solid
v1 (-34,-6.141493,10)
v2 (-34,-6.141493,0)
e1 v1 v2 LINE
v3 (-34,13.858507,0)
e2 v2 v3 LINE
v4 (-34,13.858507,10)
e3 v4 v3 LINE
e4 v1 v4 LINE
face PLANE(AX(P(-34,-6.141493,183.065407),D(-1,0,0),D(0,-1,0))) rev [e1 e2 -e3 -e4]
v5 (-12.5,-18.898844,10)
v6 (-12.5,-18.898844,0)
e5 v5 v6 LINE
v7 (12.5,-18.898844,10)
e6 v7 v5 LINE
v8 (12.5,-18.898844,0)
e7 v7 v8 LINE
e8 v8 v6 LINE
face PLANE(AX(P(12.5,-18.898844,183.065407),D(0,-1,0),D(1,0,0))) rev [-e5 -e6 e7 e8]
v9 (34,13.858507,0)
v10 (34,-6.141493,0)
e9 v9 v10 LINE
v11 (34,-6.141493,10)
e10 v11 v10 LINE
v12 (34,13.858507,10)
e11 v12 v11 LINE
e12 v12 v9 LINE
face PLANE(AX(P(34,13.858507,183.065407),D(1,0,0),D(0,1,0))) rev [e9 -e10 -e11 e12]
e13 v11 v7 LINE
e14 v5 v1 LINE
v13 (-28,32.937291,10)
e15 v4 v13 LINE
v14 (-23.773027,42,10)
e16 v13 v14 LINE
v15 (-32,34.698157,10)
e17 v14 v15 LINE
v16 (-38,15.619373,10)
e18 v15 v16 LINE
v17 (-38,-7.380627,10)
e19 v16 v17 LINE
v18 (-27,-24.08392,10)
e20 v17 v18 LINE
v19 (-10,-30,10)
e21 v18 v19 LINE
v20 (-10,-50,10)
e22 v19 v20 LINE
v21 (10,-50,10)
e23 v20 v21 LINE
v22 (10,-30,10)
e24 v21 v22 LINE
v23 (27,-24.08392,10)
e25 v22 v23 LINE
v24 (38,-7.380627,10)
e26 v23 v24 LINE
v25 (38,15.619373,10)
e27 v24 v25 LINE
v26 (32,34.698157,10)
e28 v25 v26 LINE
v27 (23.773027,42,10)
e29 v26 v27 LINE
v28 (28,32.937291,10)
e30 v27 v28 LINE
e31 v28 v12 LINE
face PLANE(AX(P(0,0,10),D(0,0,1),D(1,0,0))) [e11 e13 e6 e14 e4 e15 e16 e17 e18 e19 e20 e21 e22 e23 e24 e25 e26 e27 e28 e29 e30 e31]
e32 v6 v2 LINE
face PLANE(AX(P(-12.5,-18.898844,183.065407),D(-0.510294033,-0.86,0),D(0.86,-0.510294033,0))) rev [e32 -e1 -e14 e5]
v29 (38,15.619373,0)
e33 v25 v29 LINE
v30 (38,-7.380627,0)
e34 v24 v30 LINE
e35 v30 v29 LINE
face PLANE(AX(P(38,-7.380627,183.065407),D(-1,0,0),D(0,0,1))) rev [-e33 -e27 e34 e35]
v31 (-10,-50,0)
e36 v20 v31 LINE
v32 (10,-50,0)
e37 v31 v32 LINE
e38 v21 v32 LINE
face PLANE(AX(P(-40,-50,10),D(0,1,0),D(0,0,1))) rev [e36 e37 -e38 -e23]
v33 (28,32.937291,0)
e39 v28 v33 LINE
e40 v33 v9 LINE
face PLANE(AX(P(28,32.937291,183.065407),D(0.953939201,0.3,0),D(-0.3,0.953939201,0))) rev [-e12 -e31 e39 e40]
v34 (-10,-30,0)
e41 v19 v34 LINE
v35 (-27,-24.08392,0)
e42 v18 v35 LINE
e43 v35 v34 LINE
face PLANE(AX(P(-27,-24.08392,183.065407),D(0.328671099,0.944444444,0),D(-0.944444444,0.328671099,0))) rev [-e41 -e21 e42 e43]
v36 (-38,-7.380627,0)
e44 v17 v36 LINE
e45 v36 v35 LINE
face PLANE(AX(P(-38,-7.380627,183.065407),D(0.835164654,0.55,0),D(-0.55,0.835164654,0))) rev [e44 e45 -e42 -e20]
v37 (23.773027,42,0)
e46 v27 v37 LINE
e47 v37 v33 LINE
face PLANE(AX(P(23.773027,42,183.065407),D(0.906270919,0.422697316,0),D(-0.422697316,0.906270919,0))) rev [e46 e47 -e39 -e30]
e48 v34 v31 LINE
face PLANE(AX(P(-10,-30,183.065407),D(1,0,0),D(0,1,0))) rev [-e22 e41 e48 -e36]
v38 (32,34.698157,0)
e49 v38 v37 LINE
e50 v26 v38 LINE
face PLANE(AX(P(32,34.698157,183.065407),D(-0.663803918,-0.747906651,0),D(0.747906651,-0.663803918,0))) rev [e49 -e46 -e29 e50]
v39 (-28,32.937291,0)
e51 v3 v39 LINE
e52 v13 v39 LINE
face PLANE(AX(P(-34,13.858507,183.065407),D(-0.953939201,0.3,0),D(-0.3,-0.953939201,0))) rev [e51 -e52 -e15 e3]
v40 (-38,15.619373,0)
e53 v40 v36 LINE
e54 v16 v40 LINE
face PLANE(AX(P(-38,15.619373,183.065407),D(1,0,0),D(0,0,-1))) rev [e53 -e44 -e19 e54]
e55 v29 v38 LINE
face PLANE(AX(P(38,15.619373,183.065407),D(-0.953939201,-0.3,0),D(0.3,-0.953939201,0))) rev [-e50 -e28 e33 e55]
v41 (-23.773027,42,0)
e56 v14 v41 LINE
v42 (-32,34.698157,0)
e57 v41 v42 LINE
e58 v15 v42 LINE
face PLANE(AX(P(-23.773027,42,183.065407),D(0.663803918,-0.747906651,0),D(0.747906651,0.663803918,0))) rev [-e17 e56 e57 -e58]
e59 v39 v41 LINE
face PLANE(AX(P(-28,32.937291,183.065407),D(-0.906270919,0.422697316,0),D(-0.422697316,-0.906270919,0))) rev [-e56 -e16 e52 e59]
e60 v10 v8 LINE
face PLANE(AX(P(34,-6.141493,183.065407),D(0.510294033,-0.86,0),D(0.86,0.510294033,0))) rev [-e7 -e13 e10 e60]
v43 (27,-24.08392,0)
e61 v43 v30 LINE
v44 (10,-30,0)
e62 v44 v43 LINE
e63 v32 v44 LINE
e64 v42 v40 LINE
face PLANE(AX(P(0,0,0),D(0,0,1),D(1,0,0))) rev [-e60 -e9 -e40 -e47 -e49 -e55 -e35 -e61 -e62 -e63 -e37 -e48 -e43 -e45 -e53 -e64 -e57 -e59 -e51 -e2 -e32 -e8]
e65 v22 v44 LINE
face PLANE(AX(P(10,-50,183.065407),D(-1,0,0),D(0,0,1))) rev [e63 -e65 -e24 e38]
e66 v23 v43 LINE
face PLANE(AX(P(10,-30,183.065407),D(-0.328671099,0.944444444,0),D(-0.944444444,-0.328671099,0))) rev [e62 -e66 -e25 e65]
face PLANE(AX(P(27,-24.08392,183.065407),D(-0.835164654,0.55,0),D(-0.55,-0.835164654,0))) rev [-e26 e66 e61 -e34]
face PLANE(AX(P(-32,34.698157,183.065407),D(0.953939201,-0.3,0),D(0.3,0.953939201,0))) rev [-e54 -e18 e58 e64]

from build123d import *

# Parameters (mm, degrees)
ESQUISSE1_W             = 80
ESQUISSE1_H             = 100
BOSS_EXTRU_1_DEPTH      = 10
ENL_V_START             = -10
ENL_V_MAT_EXTRU_2_DEPTH = 10


# Read off the part's stored shape, not the designer's step: Enlèv. mat.-Extru.2
with BuildPart() as part:
    # Esquisse1 → Boss.-Extru.1 (new body)
    with BuildSketch(Plane.XY):
        Rectangle(ESQUISSE1_W, ESQUISSE1_H)
    extrude(amount=BOSS_EXTRU_1_DEPTH)

    # Enlèv. mat.-Extru.2 outline → Enlèv. mat.-Extru.2 (cut)
    with BuildSketch(Plane.XY.offset(10).offset(ENL_V_START)):
        Polygon((-40, -50), (-10, -50), (-10, -30), (-27, -24.083920217), (-38, -7.380627128), (-38, 15.619372872), (-32, 34.6981569), (-23.773026842, 42), (-28, 32.937290807), (-34, 13.858506778), (-34, -6.141493222), (-12.5, -18.898844044), (12.5, -18.898844044), (34, -6.141493222), (34, 13.858506778), (28, 32.937290807), (23.773026842, 42), (32, 34.6981569), (38, 15.619372872), (38, -7.380627128), (27, -24.083920217), (10, -30), (10, -50), (40, -50), (40, 50), (-40, 50), align=None)
    extrude(amount=ENL_V_MAT_EXTRU_2_DEPTH, mode=Mode.SUBTRACT)


solid = part.part
